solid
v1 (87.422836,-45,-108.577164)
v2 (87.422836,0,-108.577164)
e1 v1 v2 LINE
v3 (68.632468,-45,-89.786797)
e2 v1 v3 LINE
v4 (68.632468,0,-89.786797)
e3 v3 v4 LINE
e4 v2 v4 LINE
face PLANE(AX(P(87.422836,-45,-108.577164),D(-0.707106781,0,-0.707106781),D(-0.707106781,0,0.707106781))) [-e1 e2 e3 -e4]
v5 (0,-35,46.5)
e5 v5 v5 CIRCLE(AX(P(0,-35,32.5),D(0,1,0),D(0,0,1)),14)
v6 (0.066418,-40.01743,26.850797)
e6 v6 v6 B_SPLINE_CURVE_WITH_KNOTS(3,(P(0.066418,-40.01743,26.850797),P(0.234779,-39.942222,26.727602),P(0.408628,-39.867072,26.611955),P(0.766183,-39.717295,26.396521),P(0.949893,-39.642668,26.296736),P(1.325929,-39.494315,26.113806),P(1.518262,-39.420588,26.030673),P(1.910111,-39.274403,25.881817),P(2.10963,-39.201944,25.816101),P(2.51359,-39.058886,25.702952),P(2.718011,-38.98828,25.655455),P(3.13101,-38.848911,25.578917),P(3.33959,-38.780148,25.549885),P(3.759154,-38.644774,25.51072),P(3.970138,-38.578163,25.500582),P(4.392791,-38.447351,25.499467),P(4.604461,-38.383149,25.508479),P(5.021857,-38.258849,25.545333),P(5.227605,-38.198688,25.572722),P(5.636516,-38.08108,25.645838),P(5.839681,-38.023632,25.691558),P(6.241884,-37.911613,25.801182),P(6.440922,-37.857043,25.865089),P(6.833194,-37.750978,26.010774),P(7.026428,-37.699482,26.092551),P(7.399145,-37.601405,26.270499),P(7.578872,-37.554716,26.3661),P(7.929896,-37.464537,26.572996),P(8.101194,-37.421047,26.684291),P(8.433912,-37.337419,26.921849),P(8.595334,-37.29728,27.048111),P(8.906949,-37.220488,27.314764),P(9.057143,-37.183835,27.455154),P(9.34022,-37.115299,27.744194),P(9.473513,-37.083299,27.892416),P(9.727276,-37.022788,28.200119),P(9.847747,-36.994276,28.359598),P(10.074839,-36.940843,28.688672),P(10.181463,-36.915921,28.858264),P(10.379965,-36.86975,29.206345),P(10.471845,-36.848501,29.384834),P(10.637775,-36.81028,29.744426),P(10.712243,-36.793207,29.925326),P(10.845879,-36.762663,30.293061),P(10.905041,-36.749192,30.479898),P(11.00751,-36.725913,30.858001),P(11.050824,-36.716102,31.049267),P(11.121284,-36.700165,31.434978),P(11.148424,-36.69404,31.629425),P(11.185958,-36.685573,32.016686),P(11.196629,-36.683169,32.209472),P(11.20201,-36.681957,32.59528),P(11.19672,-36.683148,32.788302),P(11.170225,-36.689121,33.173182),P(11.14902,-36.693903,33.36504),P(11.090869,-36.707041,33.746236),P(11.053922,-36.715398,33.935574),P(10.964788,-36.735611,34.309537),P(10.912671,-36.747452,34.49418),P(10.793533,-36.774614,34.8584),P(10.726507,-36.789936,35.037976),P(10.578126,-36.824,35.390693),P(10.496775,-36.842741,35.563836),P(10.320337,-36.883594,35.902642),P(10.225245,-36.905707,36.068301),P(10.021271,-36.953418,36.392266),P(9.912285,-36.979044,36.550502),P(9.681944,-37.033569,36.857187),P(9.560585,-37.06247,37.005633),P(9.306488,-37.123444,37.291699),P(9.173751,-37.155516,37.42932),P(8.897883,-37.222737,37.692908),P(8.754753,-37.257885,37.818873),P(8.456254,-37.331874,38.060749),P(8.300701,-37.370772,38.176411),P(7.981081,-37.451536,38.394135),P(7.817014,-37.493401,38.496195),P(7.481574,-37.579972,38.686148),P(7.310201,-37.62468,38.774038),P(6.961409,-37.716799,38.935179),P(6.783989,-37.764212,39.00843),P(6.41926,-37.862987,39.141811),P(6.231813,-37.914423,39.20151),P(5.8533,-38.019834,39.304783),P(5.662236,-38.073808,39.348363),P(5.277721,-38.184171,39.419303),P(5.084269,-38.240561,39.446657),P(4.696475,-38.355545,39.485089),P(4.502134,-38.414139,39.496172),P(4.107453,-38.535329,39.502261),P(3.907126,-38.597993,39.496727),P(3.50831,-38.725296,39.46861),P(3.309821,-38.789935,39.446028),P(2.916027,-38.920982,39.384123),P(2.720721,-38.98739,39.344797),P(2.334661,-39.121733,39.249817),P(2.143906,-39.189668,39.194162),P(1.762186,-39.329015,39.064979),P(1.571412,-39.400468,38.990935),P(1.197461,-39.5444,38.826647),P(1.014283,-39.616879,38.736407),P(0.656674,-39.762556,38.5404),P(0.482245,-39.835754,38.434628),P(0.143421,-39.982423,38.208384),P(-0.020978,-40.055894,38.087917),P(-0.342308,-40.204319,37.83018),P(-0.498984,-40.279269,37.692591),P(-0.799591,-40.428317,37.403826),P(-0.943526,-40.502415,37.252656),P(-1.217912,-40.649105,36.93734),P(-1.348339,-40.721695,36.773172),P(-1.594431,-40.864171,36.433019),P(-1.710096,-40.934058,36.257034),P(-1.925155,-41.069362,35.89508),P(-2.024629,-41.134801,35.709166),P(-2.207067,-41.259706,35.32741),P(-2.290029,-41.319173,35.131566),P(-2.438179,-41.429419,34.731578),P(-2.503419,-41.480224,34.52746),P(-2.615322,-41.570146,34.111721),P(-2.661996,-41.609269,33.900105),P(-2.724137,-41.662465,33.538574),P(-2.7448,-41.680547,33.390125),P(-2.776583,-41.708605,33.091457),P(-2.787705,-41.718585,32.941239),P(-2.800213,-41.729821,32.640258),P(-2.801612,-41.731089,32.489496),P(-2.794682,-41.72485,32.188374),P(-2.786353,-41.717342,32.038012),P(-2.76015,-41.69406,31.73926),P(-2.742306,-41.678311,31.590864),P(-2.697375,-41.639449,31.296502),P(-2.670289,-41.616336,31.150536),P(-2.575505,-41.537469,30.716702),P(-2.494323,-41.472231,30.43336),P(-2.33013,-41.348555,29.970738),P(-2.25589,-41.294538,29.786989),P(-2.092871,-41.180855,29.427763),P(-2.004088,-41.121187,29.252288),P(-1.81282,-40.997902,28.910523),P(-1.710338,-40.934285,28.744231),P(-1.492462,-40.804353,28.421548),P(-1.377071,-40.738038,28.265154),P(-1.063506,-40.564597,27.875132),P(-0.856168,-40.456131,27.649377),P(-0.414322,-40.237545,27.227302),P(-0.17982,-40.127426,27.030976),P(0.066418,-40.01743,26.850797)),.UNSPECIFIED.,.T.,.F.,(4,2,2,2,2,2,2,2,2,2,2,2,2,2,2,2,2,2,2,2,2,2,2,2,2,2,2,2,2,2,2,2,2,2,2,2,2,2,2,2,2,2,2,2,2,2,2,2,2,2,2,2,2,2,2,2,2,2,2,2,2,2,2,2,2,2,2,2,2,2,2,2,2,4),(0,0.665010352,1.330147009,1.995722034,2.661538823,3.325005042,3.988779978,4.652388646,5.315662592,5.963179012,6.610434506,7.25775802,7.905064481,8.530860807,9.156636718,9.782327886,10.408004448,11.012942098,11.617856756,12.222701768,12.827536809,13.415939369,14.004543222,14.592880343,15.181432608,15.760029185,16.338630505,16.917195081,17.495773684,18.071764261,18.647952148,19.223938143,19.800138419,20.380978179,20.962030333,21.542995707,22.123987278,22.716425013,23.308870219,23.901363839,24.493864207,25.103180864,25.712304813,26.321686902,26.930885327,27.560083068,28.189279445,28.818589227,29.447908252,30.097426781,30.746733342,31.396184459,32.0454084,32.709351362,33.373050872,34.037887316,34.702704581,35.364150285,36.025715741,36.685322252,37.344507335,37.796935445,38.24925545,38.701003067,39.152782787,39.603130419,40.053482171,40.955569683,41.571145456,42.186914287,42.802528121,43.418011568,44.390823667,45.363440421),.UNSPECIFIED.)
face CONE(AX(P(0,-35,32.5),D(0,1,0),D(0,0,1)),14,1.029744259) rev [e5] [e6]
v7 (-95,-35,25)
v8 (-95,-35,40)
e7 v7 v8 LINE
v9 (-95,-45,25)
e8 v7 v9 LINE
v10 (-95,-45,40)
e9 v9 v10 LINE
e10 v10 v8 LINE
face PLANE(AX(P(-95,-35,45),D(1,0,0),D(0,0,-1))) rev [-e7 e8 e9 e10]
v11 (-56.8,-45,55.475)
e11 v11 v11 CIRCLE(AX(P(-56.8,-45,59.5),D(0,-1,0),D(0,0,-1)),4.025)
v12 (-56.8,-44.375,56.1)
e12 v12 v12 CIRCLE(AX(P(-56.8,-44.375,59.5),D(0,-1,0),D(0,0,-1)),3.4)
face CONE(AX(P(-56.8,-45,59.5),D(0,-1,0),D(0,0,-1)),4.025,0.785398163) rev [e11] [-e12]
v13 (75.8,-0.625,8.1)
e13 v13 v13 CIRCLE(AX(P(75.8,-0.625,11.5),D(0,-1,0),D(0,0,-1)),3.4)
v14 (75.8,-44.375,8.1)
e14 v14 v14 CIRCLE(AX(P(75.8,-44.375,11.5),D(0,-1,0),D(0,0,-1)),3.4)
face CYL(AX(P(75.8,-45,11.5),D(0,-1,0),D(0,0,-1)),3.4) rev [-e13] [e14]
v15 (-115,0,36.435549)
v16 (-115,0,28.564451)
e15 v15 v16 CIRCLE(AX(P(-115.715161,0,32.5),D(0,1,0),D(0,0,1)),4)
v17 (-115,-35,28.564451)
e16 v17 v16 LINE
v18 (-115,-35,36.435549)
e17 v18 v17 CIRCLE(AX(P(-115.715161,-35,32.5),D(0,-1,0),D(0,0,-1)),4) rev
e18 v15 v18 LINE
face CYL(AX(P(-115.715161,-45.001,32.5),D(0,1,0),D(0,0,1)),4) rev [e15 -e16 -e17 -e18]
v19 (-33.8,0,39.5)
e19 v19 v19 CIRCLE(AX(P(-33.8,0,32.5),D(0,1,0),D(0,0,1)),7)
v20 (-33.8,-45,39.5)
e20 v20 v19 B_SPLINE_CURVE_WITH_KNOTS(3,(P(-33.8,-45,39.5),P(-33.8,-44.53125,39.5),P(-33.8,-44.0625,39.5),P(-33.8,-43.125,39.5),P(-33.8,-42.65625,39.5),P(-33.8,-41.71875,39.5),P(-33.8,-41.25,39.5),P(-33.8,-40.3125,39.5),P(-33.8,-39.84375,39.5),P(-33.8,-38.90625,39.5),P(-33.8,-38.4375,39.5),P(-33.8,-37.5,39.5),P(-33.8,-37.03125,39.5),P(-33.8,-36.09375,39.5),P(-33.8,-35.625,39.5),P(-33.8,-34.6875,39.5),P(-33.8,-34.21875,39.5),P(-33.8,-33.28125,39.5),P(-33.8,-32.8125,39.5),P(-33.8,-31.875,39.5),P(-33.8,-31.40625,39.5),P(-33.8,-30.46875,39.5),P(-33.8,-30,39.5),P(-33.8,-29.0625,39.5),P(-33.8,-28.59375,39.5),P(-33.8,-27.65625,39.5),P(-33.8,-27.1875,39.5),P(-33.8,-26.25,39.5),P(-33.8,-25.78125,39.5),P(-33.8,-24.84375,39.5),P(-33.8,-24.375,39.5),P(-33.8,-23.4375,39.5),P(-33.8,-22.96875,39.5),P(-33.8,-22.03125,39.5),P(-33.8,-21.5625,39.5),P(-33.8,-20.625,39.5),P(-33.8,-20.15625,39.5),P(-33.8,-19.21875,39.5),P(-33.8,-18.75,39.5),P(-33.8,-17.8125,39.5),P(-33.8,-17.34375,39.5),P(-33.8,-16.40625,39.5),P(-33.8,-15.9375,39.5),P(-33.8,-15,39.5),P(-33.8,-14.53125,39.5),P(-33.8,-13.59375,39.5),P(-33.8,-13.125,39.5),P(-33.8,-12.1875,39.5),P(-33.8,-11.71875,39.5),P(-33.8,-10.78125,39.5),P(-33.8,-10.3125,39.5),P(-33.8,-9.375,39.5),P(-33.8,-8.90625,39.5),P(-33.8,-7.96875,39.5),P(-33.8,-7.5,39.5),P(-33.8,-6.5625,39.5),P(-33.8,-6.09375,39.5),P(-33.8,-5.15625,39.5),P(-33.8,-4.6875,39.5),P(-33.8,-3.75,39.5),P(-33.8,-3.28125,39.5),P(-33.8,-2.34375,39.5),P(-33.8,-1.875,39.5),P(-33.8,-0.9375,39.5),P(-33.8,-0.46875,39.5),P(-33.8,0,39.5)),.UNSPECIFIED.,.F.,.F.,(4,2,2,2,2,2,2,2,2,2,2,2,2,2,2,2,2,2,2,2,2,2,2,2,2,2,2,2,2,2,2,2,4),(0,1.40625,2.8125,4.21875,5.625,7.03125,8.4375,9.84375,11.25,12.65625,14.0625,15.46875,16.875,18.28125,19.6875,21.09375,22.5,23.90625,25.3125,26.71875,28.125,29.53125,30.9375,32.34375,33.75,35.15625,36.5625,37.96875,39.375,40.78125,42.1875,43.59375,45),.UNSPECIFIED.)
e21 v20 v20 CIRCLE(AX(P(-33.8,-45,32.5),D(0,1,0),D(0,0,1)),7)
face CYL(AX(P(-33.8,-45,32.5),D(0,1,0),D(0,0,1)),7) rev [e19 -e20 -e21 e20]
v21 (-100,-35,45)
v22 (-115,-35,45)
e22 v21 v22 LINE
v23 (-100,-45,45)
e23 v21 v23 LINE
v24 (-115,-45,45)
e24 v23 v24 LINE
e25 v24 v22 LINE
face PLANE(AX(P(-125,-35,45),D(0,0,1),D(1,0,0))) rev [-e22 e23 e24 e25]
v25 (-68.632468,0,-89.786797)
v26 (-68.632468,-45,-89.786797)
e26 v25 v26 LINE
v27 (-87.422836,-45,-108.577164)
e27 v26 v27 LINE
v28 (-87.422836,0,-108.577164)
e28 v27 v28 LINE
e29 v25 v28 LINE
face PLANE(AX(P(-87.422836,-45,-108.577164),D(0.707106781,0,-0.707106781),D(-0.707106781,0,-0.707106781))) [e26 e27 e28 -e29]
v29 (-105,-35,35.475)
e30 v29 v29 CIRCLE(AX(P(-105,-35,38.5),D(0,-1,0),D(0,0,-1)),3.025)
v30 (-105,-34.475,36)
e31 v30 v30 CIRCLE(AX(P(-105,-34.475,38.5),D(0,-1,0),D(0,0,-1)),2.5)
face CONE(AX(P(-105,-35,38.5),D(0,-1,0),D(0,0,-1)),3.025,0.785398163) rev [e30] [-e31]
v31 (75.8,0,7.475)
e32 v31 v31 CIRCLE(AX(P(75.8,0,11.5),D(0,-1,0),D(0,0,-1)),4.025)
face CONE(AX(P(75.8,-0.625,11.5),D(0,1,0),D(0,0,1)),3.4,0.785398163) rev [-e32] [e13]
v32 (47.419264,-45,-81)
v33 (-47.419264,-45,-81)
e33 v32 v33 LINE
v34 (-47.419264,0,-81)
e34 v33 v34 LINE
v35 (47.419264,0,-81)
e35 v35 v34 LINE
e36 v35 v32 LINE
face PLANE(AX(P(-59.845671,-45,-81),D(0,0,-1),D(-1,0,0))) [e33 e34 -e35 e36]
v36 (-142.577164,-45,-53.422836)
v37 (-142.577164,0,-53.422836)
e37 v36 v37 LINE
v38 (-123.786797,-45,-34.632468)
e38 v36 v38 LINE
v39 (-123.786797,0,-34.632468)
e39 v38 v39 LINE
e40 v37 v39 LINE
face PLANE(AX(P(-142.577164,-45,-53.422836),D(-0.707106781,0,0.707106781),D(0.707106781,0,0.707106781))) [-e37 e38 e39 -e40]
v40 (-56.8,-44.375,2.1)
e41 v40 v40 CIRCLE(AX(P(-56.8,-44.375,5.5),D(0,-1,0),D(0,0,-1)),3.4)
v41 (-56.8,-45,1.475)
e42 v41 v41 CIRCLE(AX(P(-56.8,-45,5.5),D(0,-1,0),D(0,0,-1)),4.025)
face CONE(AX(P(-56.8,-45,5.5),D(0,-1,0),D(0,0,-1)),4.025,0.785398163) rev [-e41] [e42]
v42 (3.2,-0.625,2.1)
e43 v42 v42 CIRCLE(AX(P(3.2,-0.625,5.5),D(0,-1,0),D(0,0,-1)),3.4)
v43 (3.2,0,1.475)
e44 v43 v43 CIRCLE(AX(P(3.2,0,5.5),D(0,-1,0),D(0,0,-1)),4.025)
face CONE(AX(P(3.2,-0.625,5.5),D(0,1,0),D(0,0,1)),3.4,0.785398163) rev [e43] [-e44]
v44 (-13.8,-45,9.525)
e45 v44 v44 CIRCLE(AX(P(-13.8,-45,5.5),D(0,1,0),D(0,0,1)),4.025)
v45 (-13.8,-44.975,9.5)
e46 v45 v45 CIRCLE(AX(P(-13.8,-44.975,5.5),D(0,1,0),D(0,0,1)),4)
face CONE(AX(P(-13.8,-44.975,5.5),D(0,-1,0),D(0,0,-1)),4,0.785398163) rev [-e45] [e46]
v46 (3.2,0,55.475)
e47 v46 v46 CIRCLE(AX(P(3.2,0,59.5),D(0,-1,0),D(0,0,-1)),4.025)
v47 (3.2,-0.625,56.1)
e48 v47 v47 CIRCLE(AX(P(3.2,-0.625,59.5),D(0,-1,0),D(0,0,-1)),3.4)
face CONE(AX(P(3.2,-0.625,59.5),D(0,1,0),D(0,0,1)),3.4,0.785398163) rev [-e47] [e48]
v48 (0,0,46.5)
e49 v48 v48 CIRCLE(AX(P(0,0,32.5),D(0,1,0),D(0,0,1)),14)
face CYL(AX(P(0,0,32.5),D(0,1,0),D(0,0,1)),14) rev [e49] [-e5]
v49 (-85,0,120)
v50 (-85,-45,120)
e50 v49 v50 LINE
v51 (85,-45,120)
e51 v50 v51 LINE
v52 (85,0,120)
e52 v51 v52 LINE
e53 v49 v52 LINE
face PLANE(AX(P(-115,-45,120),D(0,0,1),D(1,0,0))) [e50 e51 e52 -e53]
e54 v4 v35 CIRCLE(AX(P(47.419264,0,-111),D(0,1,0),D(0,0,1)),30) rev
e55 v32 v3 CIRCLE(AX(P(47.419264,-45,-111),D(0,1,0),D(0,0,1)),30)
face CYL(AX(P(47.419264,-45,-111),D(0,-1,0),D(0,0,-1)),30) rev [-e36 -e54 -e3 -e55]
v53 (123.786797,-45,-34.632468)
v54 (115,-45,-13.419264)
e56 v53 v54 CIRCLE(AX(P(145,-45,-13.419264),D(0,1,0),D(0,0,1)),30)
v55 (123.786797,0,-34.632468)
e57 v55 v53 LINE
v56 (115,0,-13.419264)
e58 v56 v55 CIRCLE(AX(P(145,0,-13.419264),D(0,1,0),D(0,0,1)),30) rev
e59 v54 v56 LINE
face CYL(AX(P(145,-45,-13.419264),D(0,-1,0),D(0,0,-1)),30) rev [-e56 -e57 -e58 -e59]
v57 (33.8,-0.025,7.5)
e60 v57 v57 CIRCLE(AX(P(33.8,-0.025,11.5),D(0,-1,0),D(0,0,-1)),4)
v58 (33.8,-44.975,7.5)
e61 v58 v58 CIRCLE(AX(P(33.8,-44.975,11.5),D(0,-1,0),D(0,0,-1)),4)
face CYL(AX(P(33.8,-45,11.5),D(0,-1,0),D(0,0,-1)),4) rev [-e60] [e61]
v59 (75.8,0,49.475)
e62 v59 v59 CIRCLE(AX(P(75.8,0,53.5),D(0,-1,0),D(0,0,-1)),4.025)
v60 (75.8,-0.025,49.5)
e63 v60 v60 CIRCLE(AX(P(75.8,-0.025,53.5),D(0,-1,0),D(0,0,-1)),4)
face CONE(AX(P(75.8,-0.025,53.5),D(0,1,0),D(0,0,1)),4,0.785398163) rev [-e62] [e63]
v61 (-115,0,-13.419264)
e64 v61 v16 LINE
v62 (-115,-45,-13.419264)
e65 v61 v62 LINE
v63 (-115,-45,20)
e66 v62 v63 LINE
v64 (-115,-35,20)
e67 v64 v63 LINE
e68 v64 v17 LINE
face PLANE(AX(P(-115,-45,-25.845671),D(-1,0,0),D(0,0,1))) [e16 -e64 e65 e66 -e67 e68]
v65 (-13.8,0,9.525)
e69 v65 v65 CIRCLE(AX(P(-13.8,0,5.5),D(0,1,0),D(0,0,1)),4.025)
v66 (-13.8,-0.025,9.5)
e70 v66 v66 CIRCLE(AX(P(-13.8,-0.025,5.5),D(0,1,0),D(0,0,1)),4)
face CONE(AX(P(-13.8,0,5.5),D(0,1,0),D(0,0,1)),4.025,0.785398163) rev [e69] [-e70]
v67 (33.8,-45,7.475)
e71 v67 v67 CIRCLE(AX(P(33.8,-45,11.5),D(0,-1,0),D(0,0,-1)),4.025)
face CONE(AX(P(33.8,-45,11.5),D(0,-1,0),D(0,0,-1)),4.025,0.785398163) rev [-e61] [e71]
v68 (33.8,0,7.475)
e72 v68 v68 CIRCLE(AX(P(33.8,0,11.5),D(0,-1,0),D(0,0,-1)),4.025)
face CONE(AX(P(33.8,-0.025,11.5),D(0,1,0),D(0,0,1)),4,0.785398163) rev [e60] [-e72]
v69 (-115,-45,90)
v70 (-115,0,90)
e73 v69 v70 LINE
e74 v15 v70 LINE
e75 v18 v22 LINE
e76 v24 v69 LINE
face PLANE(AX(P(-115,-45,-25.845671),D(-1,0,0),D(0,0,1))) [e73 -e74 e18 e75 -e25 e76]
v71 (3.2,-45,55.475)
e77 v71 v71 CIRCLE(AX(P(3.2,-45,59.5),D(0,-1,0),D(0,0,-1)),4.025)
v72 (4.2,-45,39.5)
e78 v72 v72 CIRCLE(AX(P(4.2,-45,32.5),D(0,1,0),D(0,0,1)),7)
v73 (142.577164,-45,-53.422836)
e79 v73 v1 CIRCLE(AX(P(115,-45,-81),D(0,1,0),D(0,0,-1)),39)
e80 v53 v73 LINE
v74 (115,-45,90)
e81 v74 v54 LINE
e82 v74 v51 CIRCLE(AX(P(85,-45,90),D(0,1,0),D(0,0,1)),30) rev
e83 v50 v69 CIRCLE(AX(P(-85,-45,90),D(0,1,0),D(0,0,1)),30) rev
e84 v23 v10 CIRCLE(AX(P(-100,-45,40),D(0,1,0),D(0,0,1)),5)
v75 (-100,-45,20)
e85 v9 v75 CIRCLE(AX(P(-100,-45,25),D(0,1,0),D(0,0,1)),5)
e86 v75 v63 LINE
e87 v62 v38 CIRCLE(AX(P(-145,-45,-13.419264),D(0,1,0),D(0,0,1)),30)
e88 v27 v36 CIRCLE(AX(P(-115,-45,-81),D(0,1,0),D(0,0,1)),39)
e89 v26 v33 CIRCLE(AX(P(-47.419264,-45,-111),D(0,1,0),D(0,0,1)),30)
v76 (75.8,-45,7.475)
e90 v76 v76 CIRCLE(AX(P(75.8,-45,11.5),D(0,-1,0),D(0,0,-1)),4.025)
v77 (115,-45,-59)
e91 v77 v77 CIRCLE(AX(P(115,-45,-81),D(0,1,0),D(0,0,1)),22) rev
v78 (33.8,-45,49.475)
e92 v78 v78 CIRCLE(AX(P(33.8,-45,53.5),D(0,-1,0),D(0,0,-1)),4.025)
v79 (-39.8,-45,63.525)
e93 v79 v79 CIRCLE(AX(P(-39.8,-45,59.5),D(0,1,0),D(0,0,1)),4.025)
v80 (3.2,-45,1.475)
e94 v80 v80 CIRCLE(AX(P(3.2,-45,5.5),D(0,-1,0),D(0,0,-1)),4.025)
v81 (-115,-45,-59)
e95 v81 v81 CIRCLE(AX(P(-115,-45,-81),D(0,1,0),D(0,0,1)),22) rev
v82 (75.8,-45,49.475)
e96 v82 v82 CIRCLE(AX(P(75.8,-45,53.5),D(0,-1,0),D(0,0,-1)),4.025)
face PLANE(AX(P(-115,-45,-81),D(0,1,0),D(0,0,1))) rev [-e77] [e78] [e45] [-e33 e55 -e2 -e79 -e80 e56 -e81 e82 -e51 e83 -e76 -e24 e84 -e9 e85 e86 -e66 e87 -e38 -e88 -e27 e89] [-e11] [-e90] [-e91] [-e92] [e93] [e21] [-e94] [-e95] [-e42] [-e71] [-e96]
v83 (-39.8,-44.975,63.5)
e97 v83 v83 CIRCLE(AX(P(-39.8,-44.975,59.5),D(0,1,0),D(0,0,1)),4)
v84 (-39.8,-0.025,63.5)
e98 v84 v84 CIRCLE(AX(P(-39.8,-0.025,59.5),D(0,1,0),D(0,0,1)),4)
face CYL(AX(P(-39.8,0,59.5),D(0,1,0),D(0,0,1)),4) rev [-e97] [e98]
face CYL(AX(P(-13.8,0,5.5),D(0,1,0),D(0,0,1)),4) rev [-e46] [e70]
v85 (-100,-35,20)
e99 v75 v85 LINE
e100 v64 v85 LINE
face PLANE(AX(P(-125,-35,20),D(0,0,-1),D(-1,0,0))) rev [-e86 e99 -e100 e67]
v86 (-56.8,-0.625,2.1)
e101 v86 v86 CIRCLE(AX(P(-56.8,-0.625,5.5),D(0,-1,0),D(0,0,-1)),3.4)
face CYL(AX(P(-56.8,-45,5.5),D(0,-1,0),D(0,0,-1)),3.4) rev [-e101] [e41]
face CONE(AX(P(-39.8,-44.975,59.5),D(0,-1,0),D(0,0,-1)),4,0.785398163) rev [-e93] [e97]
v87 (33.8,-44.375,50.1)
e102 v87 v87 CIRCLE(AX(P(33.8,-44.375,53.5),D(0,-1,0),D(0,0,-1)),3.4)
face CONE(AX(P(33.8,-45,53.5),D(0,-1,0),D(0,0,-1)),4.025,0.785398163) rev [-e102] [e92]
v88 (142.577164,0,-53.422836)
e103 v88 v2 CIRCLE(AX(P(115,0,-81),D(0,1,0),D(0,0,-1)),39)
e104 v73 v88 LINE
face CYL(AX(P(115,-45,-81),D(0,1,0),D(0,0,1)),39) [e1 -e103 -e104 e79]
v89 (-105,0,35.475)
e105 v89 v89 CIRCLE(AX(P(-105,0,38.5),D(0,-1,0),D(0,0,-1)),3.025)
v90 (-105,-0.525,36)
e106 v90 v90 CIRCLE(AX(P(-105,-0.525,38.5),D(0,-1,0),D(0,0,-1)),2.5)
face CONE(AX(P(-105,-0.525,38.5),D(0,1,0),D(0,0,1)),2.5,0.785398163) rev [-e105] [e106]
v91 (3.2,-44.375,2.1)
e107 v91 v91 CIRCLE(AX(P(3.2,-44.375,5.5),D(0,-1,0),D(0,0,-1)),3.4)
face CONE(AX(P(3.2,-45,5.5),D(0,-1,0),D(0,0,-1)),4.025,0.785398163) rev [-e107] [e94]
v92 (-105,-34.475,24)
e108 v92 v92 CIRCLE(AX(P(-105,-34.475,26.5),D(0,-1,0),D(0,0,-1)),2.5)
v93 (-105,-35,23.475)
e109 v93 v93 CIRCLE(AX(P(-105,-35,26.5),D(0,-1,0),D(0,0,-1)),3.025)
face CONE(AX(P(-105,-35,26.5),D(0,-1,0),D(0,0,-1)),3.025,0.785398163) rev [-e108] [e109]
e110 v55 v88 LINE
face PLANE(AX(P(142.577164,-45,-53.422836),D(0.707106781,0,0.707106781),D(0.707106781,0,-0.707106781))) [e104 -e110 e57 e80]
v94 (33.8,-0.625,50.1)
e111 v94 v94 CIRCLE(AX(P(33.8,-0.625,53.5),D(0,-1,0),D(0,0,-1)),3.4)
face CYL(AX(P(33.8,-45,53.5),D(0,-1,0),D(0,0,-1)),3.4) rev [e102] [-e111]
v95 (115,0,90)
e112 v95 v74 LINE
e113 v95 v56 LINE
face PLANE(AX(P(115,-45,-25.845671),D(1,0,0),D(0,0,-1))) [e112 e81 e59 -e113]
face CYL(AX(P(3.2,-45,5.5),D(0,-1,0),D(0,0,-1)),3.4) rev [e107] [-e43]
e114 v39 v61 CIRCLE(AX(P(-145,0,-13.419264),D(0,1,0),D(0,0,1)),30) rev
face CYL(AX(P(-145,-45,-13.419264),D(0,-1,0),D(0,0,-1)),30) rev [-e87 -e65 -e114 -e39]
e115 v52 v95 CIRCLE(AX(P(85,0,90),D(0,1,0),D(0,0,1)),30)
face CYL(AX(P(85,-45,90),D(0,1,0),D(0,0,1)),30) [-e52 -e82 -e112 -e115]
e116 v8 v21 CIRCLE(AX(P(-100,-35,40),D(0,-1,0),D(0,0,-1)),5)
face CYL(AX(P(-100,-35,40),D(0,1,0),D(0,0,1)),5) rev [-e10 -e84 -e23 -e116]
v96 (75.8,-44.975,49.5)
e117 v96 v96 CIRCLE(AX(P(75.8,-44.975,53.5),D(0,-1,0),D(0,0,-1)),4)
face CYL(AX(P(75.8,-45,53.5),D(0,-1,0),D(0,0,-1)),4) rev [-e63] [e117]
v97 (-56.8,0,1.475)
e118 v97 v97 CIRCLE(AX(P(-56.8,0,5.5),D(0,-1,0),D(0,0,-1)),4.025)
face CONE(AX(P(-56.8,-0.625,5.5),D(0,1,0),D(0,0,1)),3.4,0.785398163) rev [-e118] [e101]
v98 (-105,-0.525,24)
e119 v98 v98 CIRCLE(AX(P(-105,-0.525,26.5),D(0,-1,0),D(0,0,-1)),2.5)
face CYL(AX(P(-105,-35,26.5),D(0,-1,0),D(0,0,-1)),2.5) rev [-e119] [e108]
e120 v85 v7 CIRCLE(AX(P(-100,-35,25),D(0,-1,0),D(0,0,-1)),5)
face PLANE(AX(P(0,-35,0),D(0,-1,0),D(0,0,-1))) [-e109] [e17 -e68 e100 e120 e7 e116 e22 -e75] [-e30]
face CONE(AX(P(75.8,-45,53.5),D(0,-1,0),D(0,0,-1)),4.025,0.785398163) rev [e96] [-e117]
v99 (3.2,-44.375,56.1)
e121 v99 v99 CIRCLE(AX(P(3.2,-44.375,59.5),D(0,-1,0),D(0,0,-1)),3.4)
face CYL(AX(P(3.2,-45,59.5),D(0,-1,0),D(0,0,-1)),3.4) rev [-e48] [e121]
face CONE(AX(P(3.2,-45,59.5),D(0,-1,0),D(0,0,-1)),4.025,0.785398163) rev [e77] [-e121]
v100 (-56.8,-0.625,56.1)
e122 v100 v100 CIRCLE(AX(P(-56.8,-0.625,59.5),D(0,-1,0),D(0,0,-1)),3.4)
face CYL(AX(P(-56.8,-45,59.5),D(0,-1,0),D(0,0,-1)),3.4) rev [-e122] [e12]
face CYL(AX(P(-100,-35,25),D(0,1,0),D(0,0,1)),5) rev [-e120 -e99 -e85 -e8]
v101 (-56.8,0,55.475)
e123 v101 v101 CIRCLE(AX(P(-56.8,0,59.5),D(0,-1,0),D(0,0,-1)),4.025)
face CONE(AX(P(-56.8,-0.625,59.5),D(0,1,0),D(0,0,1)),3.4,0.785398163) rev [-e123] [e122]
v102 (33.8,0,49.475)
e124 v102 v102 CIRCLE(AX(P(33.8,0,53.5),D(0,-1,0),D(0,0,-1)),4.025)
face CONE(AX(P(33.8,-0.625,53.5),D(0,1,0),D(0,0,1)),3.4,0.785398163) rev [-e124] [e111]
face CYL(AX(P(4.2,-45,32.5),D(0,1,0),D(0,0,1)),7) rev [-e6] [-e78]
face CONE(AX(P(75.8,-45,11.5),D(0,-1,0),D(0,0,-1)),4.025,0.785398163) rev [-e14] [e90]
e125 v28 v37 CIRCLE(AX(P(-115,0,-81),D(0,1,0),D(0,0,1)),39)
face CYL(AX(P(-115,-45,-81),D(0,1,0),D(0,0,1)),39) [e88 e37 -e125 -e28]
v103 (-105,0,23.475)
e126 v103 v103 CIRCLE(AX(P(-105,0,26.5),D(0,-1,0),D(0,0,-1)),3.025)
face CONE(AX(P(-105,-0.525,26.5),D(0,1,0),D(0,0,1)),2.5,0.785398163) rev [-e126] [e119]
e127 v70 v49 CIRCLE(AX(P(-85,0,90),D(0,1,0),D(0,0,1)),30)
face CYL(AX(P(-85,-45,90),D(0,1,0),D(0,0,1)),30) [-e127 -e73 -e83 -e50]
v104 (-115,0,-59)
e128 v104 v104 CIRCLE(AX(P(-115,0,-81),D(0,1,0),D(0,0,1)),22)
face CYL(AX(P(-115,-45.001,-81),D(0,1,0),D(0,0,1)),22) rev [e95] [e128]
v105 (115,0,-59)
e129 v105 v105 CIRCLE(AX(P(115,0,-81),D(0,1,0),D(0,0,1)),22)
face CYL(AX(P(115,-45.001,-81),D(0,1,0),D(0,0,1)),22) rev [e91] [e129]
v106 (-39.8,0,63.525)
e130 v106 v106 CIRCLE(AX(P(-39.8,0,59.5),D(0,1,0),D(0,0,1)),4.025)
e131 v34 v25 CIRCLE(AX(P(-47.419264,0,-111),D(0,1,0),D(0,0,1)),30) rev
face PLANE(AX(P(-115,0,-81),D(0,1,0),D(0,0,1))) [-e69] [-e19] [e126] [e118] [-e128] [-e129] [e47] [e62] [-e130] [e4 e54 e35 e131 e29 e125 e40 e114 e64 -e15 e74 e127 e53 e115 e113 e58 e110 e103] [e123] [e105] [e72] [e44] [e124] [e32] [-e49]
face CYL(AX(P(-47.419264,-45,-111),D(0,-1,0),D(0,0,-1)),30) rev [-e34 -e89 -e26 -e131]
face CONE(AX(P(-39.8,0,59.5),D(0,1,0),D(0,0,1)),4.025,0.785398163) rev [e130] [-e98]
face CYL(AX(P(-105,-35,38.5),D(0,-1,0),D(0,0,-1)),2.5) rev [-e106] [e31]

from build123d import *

# Parameters (mm, degrees)
BOSS_EXTRUDE1_DEPTH        = 45
FILLET1_R                  = 30
CUT_EXTRUDE1_REACH         = 202.352
SKETCH2_R                  = 22
FILLET2_R                  = 30
M30X2_0_TAPPED_HOLE1_D     = 28
M30X2_0_TAPPED_HOLE1_DEPTH = 35
M30X2_0_TAPPED_HOLE1_TIP   = 8.412048666
SKETCH5_R                  = 7
CUT_EXTRUDE2_DEPTH         = 201.352189906
SKETCH6_W                  = 30
SKETCH6_H                  = 25
CUT_EXTRUDE3_DEPTH         = 10
FILLET3_R                  = 5
M6_TAPPED_HOLE1_AT_2_COUNT = 2
M6_TAPPED_HOLE1_AT_2_PITCH = 12
CUT_EXTRUDE4_REACH         = 202.352
SKETCH9_R                  = 4


# Read off the part's stored shape, not the designer's step: M8 Tapped Hole1, Ø8.0mm Dowel Hole1, M8 Tapped Hole2, Ø8.0mm Dowel Hole2
with BuildPart() as part:
    # Sketch1 → Boss-Extrude1 (new body)
    with BuildSketch(Plane(origin=(0, 0, 0), x_dir=(1, 0, 0), z_dir=(0, 1, 0))):
        with BuildLine():
            Line((-142.577164466, 53.422835534), (-115, 25.845671067))
            Line((-115, 25.845671067), (-115, -120))
            Line((-115, -120), (115, -120))
            Line((115, -120), (115, 25.845671067))
            Line((115, 25.845671067), (142.577164466, 53.422835534))
            ThreePointArc((142.577164466, 53.422835534), (142.577164466, 108.577164466), (87.422835534, 108.577164466))
            Line((87.422835534, 108.577164466), (59.845671067, 81))
            Line((59.845671067, 81), (-59.845671067, 81))
            Line((-59.845671067, 81), (-87.422835534, 108.577164466))
            ThreePointArc((-87.422835534, 108.577164466), (-142.577164466, 108.577164466), (-142.577164466, 53.422835534))
        make_face()
    extrude(amount=-BOSS_EXTRUDE1_DEPTH)

    # Fillet1
    fillet1_edges = [part.edges().sort_by_distance(p)[0] for p in [
        (-59.845671067, -22.5, -81),
        (59.845671067, -22.5, -81),
        (115, -22.5, -25.845671067),
        (-115, -22.5, -25.845671067),
    ]]
    fillet(fillet1_edges, radius=FILLET1_R)

    # Sketch2 → Cut-Extrude1 (cut, up to next)
    with BuildSketch(Plane(origin=(0, 0, 0), x_dir=(1, 0, 0), z_dir=(0, 1, 0)), mode=Mode.PRIVATE) as cut_extrude1_sk1:
        with Locations(Location((-115, 81, 0), (0, 0, 270))):
            Circle(SKETCH2_R)
    cut_extrude1_tool1 = extrude(cut_extrude1_sk1.sketch, amount=-CUT_EXTRUDE1_REACH, mode=Mode.PRIVATE) & part.part
    # Sketch2 → Cut-Extrude1 (cut, up to next)
    with BuildSketch(Plane(origin=(0, 0, 0), x_dir=(1, 0, 0), z_dir=(0, 1, 0)), mode=Mode.PRIVATE) as cut_extrude1_sk2:
        with Locations(Location((115, 81, 0), (0, 0, 270))):
            Circle(SKETCH2_R)
    cut_extrude1_tool2 = extrude(cut_extrude1_sk2.sketch, amount=-CUT_EXTRUDE1_REACH, mode=Mode.PRIVATE) & part.part
    add(cut_extrude1_tool1.solids().sort_by_distance((-115, 0, -81))[0], mode=Mode.SUBTRACT)
    add(cut_extrude1_tool2.solids().sort_by_distance((115, 0, -81))[0], mode=Mode.SUBTRACT)

    # Fillet2
    fillet2_edges = [part.edges().sort_by_distance(p)[0] for p in [
        (115, -22.5, 120),
        (-115, -22.5, 120),
    ]]
    fillet(fillet2_edges, radius=FILLET2_R)

    # M30x2.0 Tapped Hole1
    with Locations(Plane(origin=(0, 0, 0), x_dir=(1, 0, 0), z_dir=(0, 1, 0))):
        with Locations((0, -32.5)):
            Hole(M30X2_0_TAPPED_HOLE1_D / 2, depth=M30X2_0_TAPPED_HOLE1_DEPTH)
            with Locations((0, 0, -(M30X2_0_TAPPED_HOLE1_DEPTH + M30X2_0_TAPPED_HOLE1_TIP / 2))):  # 118° drill point
                Cone(0, M30X2_0_TAPPED_HOLE1_D / 2, M30X2_0_TAPPED_HOLE1_TIP, mode=Mode.SUBTRACT)

    # Sketch5 → Cut-Extrude2 (cut, through all)
    with BuildSketch(Plane(origin=(0, 0, 0), x_dir=(1, 0, 0), z_dir=(0, 1, 0))):
        with Locations(Location((-33.8, -32.5, 0), (0, 0, 270))):
            Circle(SKETCH5_R)
        with Locations(Location((4.2, -32.5, 0), (0, 0, 270))):
            Circle(SKETCH5_R)
    extrude(amount=-CUT_EXTRUDE2_DEPTH, mode=Mode.SUBTRACT)

    # Sketch6 → Cut-Extrude3 (cut)
    with BuildSketch(Plane.XZ.offset(45)):
        with Locations((-110, 32.5)):
            Rectangle(SKETCH6_W, SKETCH6_H)
    extrude(amount=-CUT_EXTRUDE3_DEPTH, mode=Mode.SUBTRACT)

    # Fillet3
    fillet3_edges = [part.edges().sort_by_distance(p)[0] for p in [
        (-95, -40, 45),
        (-95, -40, 20),
    ]]
    fillet(fillet3_edges, radius=FILLET3_R)

    # Sketch8 → M6 Tapped Hole1 (revolve, cut)
    with BuildSketch(Plane(origin=(-105, -35, 26.5), x_dir=(0, 0, -1), z_dir=(1, 0, 0))):
        Polygon((0, 0), (0, 35), (3.025, 35), (2.5, 34.475), (2.5, 0.525), (3.025, 0), align=None)
    m6_tapped_hole1 = revolve(axis=Axis((-105, -41.35, 26.5), (0, 1, 0)), mode=Mode.SUBTRACT)

    # M6 Tapped Hole1 at 2: M6 Tapped Hole1 ×2
    with Locations(*[(0, 0, i * M6_TAPPED_HOLE1_AT_2_PITCH) for i in range(1, M6_TAPPED_HOLE1_AT_2_COUNT)]):
        add(m6_tapped_hole1, mode=Mode.SUBTRACT)

    # Sketch9 → Cut-Extrude4 (cut, up to next)
    with BuildSketch(Plane(origin=(0, 0, 0), x_dir=(1, 0, 0), z_dir=(0, 1, 0)), mode=Mode.PRIVATE) as cut_extrude4_sk1:
        with Locations((-115.715161352, -32.5)):
            Circle(SKETCH9_R)
    cut_extrude4_tool1 = extrude(cut_extrude4_sk1.sketch, amount=-CUT_EXTRUDE4_REACH, mode=Mode.PRIVATE) & part.part
    add(cut_extrude4_tool1.solids().sort_by_distance((-115.715161, 0, 32.5))[0], mode=Mode.SUBTRACT)

    # M8 Tapped Hole1 outline → M8 Tapped Hole1 (revolve, cut)
    with BuildSketch(Plane(origin=(-56.8, 0, 59.5), x_dir=(1, 0, 0), z_dir=(0, 0, 1))):
        Polygon((4.025, 0), (0, 0), (0, -45), (4.025, -45), (3.4, -44.375), (3.4, -0.625), align=None)
    revolve(axis=Axis((-56.8, 0, 59.5), (0, 1, 0)), mode=Mode.SUBTRACT)

    # M8 Tapped Hole1 2 outline → M8 Tapped Hole1 2 (revolve, cut)
    with BuildSketch(Plane(origin=(3.2, 0, 59.5), x_dir=(1, 0, 0), z_dir=(0, 0, 1))):
        Polygon((4.025, 0), (0, 0), (0, -45), (4.025, -45), (3.4, -44.375), (3.4, -0.625), align=None)
    revolve(axis=Axis((3.2, 0, 59.5), (0, 1, 0)), mode=Mode.SUBTRACT)

    # M8 Tapped Hole1 3 outline → M8 Tapped Hole1 3 (revolve, cut)
    with BuildSketch(Plane(origin=(3.2, 0, 5.5), x_dir=(1, 0, 0), z_dir=(0, 0, 1))):
        Polygon((4.025, 0), (0, 0), (0, -45), (4.025, -45), (3.4, -44.375), (3.4, -0.625), align=None)
    revolve(axis=Axis((3.2, 0, 5.5), (0, 1, 0)), mode=Mode.SUBTRACT)

    # M8 Tapped Hole1 4 outline → M8 Tapped Hole1 4 (revolve, cut)
    with BuildSketch(Plane(origin=(-56.8, 0, 5.5), x_dir=(1, 0, 0), z_dir=(0, 0, 1))):
        Polygon((4.025, 0), (0, 0), (0, -45), (4.025, -45), (3.4, -44.375), (3.4, -0.625), align=None)
    revolve(axis=Axis((-56.8, 0, 5.5), (0, 1, 0)), mode=Mode.SUBTRACT)

    # Ø8.0mm Dowel Hole1 outline → Ø8.0mm Dowel Hole1 (revolve, cut)
    with BuildSketch(Plane(origin=(-39.8, 0, 59.5), x_dir=(1, 0, 0), z_dir=(0, 0, 1))):
        Polygon((0, -45), (4.025, -45), (4, -44.975), (4, -0.025), (4.025, 0), (0, 0), align=None)
    revolve(axis=Axis((-39.8, 0, 59.5), (0, 1, 0)), mode=Mode.SUBTRACT)

    # 8.0mm Dowel Hole1 2 outline → 8.0mm Dowel Hole1 2 (revolve, cut)
    with BuildSketch(Plane(origin=(-13.8, 0, 5.5), x_dir=(1, 0, 0), z_dir=(0, 0, 1))):
        Polygon((0, -45), (4.025, -45), (4, -44.975), (4, -0.025), (4.025, 0), (0, 0), align=None)
    revolve(axis=Axis((-13.8, 0, 5.5), (0, 1, 0)), mode=Mode.SUBTRACT)

    # M8 Tapped Hole2 outline → M8 Tapped Hole2 (revolve, cut)
    with BuildSketch(Plane(origin=(75.8, 0, 11.5), x_dir=(1, 0, 0), z_dir=(0, 0, 1))):
        Polygon((4.025, 0), (0, 0), (0, -45), (4.025, -45), (3.4, -44.375), (3.4, -0.625), align=None)
    revolve(axis=Axis((75.8, 0, 11.5), (0, 1, 0)), mode=Mode.SUBTRACT)

    # M8 Tapped Hole2 2 outline → M8 Tapped Hole2 2 (revolve, cut)
    with BuildSketch(Plane(origin=(33.8, 0, 53.5), x_dir=(1, 0, 0), z_dir=(0, 0, 1))):
        Polygon((4.025, 0), (0, 0), (0, -45), (4.025, -45), (3.4, -44.375), (3.4, -0.625), align=None)
    revolve(axis=Axis((33.8, 0, 53.5), (0, 1, 0)), mode=Mode.SUBTRACT)

    # Ø8.0mm Dowel Hole2 outline → Ø8.0mm Dowel Hole2 (revolve, cut)
    with BuildSketch(Plane(origin=(75.8, 0, 53.5), x_dir=(1, 0, 0), z_dir=(0, 0, 1))):
        Polygon((4.025, 0), (0, 0), (0, -45), (4.025, -45), (4, -44.975), (4, -0.025), align=None)
    revolve(axis=Axis((75.8, 0, 53.5), (0, 1, 0)), mode=Mode.SUBTRACT)

    # 8.0mm Dowel Hole2 2 outline → 8.0mm Dowel Hole2 2 (revolve, cut)
    with BuildSketch(Plane(origin=(33.8, 0, 11.5), x_dir=(1, 0, 0), z_dir=(0, 0, 1))):
        Polygon((4.025, 0), (0, 0), (0, -45), (4.025, -45), (4, -44.975), (4, -0.025), align=None)
    revolve(axis=Axis((33.8, 0, 11.5), (0, 1, 0)), mode=Mode.SUBTRACT)


solid = part.part
